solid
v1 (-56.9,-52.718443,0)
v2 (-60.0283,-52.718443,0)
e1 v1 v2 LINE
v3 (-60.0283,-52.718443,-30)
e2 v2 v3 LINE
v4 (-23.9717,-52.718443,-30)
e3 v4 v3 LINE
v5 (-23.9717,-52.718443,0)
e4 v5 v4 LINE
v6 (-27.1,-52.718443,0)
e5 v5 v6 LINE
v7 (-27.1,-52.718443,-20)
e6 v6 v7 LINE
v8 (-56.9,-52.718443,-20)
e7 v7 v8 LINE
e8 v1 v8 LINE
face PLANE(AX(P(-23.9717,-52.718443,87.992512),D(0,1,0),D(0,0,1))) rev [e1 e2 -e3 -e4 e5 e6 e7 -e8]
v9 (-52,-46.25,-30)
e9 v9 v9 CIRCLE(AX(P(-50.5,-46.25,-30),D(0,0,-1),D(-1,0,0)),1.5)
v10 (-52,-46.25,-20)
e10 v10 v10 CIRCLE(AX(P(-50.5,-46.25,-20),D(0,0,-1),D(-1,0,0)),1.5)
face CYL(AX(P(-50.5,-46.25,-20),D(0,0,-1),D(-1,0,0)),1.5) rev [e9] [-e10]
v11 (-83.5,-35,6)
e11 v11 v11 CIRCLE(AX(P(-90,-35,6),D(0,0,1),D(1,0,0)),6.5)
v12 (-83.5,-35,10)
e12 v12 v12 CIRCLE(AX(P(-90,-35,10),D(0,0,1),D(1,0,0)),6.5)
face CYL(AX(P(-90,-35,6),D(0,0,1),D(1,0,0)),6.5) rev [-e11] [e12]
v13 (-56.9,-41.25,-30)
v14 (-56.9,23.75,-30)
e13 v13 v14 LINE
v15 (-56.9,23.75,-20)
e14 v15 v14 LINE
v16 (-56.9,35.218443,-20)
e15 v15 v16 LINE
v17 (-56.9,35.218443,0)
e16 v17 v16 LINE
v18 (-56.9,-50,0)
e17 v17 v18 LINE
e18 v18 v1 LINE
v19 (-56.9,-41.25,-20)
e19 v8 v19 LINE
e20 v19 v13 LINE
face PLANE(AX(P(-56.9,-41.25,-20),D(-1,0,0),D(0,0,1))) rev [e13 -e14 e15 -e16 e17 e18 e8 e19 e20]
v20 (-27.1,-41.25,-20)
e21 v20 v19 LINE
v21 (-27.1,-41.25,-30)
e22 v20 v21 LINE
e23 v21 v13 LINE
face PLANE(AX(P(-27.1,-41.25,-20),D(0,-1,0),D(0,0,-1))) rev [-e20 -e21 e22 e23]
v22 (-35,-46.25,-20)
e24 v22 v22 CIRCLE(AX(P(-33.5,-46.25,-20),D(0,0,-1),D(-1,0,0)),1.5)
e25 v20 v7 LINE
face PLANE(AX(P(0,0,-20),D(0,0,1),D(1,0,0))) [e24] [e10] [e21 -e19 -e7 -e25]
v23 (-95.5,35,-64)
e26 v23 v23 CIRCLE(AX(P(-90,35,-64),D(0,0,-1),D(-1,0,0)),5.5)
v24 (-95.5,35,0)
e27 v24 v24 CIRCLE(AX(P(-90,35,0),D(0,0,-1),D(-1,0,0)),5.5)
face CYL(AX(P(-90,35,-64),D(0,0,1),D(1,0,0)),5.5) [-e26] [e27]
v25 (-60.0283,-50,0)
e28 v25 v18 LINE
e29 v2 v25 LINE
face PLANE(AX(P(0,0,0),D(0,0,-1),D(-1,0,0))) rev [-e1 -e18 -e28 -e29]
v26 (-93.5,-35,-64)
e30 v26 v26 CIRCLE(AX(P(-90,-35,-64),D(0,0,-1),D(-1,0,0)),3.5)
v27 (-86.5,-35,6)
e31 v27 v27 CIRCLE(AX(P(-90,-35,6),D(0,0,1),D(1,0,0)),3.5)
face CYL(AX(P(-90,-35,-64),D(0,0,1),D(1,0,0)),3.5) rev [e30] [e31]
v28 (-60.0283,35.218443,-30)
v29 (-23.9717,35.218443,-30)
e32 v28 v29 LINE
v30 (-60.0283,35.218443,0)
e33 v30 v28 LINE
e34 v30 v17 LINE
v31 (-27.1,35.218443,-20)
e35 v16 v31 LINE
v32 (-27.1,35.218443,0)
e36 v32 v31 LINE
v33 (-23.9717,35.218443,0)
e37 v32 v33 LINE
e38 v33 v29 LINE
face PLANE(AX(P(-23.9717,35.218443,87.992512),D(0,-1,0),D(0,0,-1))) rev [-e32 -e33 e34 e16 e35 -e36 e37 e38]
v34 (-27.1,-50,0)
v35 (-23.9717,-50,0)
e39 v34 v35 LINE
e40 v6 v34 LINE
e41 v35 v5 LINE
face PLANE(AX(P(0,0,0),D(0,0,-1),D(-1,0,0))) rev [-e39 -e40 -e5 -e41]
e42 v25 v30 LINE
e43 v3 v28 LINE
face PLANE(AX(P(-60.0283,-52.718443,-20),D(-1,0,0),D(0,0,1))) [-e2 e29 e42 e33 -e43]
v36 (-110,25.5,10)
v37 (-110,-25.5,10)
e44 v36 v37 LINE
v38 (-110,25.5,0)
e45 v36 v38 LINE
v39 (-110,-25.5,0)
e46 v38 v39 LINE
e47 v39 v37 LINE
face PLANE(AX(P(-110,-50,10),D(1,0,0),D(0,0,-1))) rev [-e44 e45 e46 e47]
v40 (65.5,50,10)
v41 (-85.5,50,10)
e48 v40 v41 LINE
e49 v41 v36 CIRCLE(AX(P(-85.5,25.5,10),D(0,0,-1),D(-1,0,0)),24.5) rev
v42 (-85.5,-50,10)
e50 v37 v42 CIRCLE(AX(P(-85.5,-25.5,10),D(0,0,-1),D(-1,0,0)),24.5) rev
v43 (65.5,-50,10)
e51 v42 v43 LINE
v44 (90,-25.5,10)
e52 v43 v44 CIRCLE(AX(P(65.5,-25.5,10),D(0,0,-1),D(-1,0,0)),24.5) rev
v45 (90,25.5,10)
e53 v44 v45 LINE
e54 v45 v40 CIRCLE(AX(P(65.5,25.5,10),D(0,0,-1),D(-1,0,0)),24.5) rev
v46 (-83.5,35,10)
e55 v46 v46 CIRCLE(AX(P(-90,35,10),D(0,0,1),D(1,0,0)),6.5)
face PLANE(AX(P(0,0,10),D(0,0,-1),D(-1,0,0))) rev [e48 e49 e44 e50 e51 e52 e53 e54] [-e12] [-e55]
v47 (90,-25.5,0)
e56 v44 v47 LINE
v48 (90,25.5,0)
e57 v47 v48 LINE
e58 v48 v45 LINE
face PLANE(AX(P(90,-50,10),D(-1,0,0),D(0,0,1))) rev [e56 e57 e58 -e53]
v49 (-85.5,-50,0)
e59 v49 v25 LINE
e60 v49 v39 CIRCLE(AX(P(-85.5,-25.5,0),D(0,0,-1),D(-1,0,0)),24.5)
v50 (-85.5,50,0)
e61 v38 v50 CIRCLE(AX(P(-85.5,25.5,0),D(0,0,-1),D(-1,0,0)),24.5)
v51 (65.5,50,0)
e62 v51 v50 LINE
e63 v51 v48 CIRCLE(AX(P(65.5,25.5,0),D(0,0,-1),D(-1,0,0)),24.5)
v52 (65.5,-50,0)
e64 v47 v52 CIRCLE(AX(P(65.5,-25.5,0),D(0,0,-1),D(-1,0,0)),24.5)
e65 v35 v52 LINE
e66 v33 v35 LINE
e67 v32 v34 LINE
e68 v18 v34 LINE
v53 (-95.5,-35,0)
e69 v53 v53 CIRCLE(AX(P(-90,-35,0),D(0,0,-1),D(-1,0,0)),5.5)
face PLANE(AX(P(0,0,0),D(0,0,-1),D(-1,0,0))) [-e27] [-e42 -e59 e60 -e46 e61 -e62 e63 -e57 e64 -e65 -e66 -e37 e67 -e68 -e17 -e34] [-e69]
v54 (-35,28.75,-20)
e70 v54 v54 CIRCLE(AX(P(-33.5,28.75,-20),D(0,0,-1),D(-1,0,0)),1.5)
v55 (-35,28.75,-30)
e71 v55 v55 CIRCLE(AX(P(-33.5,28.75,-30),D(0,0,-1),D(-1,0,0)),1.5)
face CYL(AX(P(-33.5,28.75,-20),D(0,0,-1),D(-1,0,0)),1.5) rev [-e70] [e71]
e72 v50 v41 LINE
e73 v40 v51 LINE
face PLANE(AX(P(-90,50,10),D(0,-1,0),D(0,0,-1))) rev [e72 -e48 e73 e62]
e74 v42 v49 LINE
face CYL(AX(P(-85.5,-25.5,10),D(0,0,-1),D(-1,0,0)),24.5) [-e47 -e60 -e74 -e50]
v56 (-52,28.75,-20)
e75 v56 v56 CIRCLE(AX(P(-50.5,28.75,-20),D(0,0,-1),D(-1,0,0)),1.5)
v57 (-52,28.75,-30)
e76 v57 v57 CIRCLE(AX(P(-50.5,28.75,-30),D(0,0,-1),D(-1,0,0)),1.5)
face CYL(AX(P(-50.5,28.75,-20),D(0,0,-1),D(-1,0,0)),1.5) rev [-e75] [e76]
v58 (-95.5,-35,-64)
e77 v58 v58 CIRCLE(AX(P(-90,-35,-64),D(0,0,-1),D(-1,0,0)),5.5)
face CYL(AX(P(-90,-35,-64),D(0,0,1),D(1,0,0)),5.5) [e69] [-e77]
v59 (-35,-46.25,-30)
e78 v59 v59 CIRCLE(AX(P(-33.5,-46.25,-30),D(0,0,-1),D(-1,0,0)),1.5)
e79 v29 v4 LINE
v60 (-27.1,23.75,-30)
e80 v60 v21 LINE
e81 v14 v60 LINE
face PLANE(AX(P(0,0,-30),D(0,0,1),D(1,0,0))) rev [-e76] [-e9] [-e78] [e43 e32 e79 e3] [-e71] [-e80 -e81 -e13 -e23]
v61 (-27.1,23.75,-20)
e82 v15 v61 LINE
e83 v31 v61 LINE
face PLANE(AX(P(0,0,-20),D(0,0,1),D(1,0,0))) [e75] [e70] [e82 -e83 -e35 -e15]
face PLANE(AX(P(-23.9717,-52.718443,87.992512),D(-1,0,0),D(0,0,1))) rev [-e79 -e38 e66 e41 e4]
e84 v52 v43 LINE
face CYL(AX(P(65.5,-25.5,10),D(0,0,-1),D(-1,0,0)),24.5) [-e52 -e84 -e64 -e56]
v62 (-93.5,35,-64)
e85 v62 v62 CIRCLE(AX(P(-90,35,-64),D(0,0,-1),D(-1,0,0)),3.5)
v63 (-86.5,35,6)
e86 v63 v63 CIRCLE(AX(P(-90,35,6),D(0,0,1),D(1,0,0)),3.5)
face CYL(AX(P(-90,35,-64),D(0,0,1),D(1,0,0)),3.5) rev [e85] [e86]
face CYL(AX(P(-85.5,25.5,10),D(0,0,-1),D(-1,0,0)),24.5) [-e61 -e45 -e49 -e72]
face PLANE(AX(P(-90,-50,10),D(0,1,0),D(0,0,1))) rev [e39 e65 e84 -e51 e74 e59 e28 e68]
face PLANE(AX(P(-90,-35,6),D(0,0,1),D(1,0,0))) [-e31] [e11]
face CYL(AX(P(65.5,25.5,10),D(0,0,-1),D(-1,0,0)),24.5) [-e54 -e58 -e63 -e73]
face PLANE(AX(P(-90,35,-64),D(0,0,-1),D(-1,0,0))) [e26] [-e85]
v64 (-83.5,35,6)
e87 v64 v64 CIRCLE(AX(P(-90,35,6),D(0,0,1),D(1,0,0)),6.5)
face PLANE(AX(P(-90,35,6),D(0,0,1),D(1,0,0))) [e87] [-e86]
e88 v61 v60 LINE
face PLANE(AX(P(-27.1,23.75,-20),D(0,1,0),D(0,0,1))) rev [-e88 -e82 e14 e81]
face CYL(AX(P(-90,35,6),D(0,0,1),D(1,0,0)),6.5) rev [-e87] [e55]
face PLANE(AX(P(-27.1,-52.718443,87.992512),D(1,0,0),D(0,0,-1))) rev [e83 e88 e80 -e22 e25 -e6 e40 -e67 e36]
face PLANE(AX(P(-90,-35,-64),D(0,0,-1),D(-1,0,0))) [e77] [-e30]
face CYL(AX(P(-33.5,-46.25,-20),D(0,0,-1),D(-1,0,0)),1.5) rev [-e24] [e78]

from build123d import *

# Parameters (mm, degrees)
SKETCH1_W              = 180
SKETCH1_H              = 100
BOSS_EXTRUDE1_DEPTH    = 10
FILLET1_R              = 24.5
SKETCH5_R              = 5.5
SKETCH5_R_2            = 3.5
BOSS_EXTRUDE4_DEPTH    = 64
MOVE_FACE2_DEPTH       = 10
MOVE_START             = -64
MOVE_FACE3_OUTLINE_R   = 3.5
MOVE_FACE3_DEPTH       = 64
MOVE_FACE3_2_DEPTH     = 10
MOVE_FACE3_3_OUTLINE_R = 3.5
MOVE_FACE3_3_DEPTH     = 64
SKETCH7_R              = 3.5
CUT_EXTRUDE2_DEPTH     = 74
SKETCH8_R              = 6.5
CUT_EXTRUDE3_DEPTH     = 4
SKETCH9_W              = 36.05660051
SKETCH9_H              = 87.936885764
SKETCH9_R              = 1.5
SKETCH9_W_2            = 29.8
SKETCH9_H_2            = 65
BOSS_EXTRUDE6_DEPTH    = 10
SKETCH10_W             = 3.128300255
SKETCH10_H             = 87.936885764
BOSS_EXTRUDE7_DEPTH    = 20


# Read off the part's stored shape, not the designer's step: Move Face2, Move Face3
with BuildPart() as part:
    # Sketch1 → Boss-Extrude1 (new body)
    with BuildSketch(Plane.XY):
        Rectangle(SKETCH1_W, SKETCH1_H)
    extrude(amount=BOSS_EXTRUDE1_DEPTH)

    # Fillet1
    fillet1_edges = [part.edges().sort_by_distance(p)[0] for p in [
        (90, -50, 5),
        (-90, -50, 5),
        (-90, 50, 5),
        (90, 50, 5),
    ]]
    fillet(fillet1_edges, radius=FILLET1_R)

    # Sketch5 → Boss-Extrude4 (add)
    # profile 1 of 2: a face of its own
    with BuildSketch(Plane(origin=(0, 0, 0), x_dir=(-1, 0, 0), z_dir=(0, 0, -1))):
        with Locations((80, 35)):
            Circle(SKETCH5_R)
        with Locations((80, 35)):
            Circle(SKETCH5_R_2, mode=Mode.SUBTRACT)
    # profile 2 of 2: a face of its own
    with BuildSketch(Plane(origin=(0, 0, 0), x_dir=(-1, 0, 0), z_dir=(0, 0, -1))):
        with Locations((80, -35)):
            Circle(SKETCH5_R)
        with Locations((80, -35)):
            Circle(SKETCH5_R_2, mode=Mode.SUBTRACT)
    extrude(amount=BOSS_EXTRUDE4_DEPTH)

    # Move Face2 outline → Move Face2 (add)
    with BuildSketch(Plane.XY):
        with BuildLine():
            Line((-100, 25.5), (-100, -25.5))
            ThreePointArc((-100, -25.5), (-92.824116139, -42.824116139), (-75.5, -50))
            Line((-75.5, -50), (-65.5, -50))
            ThreePointArc((-65.5, -50), (-82.824116139, -42.824116139), (-90, -25.5))
            Line((-90, -25.5), (-90, 25.5))
            ThreePointArc((-90, 25.5), (-82.824116139, 42.824116139), (-65.5, 50))
            Line((-65.5, 50), (-75.5, 50))
            ThreePointArc((-75.5, 50), (-92.824116139, 42.824116139), (-100, 25.5))
        make_face()
    extrude(amount=MOVE_FACE2_DEPTH)

    # Move Face3 outline → Move Face3 (cut)
    # profile 1 of 2: a face of its own
    with BuildSketch(Plane.XY.offset(MOVE_START)):
        with BuildLine():
            ThreePointArc((-85, 37.291287847), (-84.5, 35), (-85, 32.708712153))
            ThreePointArc((-85, 32.708712153), (-74.5, 35), (-85, 37.291287847))
        make_face()
        with Locations((-80, 35)):
            Circle(MOVE_FACE3_OUTLINE_R, mode=Mode.SUBTRACT)
    # profile 2 of 2: a face of its own
    with BuildSketch(Plane.XY.offset(MOVE_START)):
        with BuildLine():
            ThreePointArc((-85, -32.708712153), (-84.5, -35), (-85, -37.291287847))
            ThreePointArc((-85, -37.291287847), (-74.5, -35), (-85, -32.708712153))
        make_face()
        with Locations((-80, -35)):
            Circle(MOVE_FACE3_OUTLINE_R, mode=Mode.SUBTRACT)
    extrude(amount=MOVE_FACE3_DEPTH, mode=Mode.SUBTRACT)

    # Move Face3 2 outline → Move Face3 2 (add)
    with BuildSketch(Plane.XY):
        with BuildLine():
            Line((-110, 25.5), (-110, -25.5))
            ThreePointArc((-110, -25.5), (-102.824116139, -42.824116139), (-85.5, -50))
            Line((-85.5, -50), (-75.5, -50))
            ThreePointArc((-75.5, -50), (-92.824116139, -42.824116139), (-100, -25.5))
            Line((-100, -25.5), (-100, 25.5))
            ThreePointArc((-100, 25.5), (-92.824116139, 42.824116139), (-75.5, 50))
            Line((-75.5, 50), (-85.5, 50))
            ThreePointArc((-85.5, 50), (-102.824116139, 42.824116139), (-110, 25.5))
        make_face()
    extrude(amount=MOVE_FACE3_2_DEPTH)

    # Move Face3 3 outline → Move Face3 3 (add)
    # profile 1 of 2: a face of its own
    with BuildSketch(Plane.XY.offset(MOVE_START)):
        with BuildLine():
            ThreePointArc((-85, 32.708712153), (-85.5, 35), (-85, 37.291287847))
            ThreePointArc((-85, 37.291287847), (-95.5, 35), (-85, 32.708712153))
        make_face()
        with Locations((-90, 35)):
            Circle(MOVE_FACE3_3_OUTLINE_R, mode=Mode.SUBTRACT)
    # profile 2 of 2: a face of its own
    with BuildSketch(Plane.XY.offset(MOVE_START)):
        with BuildLine():
            ThreePointArc((-85, -37.291287847), (-85.5, -35), (-85, -32.708712153))
            ThreePointArc((-85, -32.708712153), (-95.5, -35), (-85, -37.291287847))
        make_face()
        with Locations((-90, -35)):
            Circle(MOVE_FACE3_3_OUTLINE_R, mode=Mode.SUBTRACT)
    extrude(amount=MOVE_FACE3_3_DEPTH)

    # Sketch7 → Cut-Extrude2 (cut)
    with BuildSketch(Plane(origin=(0, 0, -64), x_dir=(-1, 0, 0), z_dir=(0, 0, -1))):
        with Locations((90, -35)):
            Circle(SKETCH7_R)
        with Locations((90, 35)):
            Circle(SKETCH7_R)
    extrude(amount=-CUT_EXTRUDE2_DEPTH, mode=Mode.SUBTRACT)

    # Sketch8 → Cut-Extrude3 (cut)
    with BuildSketch(Plane.XY.offset(10)):
        with Locations((-90, 35)):
            Circle(SKETCH8_R)
        with Locations((-90, -35)):
            Circle(SKETCH8_R)
    extrude(amount=-CUT_EXTRUDE3_DEPTH, mode=Mode.SUBTRACT)



with BuildPart() as body_2:
    # Sketch9 → Boss-Extrude6 (new body)
    with BuildSketch(Plane(origin=(0, 0, -30), x_dir=(-1, 0, 0), z_dir=(0, 0, -1))):
        with Locations((42, -8.75)):
            Rectangle(SKETCH9_W, SKETCH9_H)
        with Locations((33.5, 28.75)):
            Circle(SKETCH9_R, mode=Mode.SUBTRACT)
        with Locations((50.5, 28.75)):
            Circle(SKETCH9_R, mode=Mode.SUBTRACT)
        with Locations((50.5, -46.25)):
            Circle(SKETCH9_R, mode=Mode.SUBTRACT)
        with Locations((33.5, -46.25)):
            Circle(SKETCH9_R, mode=Mode.SUBTRACT)
        with Locations((42, -8.75)):
            Rectangle(SKETCH9_W_2, SKETCH9_H_2, mode=Mode.SUBTRACT)
    extrude(amount=-BOSS_EXTRUDE6_DEPTH)


with BuildPart() as part_1:
    add(part.part)

    add(body_2.part)  # Boss-Extrude7 merges body 2
    # Sketch10 → Boss-Extrude7 (add)
    with BuildSketch(Plane.XY.offset(-20)):
        with Locations((-25.535849873, -8.75)):
            Rectangle(SKETCH10_W, SKETCH10_H)
        with Locations((-58.464150128, -8.75)):
            Rectangle(SKETCH10_W, SKETCH10_H)
    extrude(amount=BOSS_EXTRUDE7_DEPTH)


solid = part_1.part
